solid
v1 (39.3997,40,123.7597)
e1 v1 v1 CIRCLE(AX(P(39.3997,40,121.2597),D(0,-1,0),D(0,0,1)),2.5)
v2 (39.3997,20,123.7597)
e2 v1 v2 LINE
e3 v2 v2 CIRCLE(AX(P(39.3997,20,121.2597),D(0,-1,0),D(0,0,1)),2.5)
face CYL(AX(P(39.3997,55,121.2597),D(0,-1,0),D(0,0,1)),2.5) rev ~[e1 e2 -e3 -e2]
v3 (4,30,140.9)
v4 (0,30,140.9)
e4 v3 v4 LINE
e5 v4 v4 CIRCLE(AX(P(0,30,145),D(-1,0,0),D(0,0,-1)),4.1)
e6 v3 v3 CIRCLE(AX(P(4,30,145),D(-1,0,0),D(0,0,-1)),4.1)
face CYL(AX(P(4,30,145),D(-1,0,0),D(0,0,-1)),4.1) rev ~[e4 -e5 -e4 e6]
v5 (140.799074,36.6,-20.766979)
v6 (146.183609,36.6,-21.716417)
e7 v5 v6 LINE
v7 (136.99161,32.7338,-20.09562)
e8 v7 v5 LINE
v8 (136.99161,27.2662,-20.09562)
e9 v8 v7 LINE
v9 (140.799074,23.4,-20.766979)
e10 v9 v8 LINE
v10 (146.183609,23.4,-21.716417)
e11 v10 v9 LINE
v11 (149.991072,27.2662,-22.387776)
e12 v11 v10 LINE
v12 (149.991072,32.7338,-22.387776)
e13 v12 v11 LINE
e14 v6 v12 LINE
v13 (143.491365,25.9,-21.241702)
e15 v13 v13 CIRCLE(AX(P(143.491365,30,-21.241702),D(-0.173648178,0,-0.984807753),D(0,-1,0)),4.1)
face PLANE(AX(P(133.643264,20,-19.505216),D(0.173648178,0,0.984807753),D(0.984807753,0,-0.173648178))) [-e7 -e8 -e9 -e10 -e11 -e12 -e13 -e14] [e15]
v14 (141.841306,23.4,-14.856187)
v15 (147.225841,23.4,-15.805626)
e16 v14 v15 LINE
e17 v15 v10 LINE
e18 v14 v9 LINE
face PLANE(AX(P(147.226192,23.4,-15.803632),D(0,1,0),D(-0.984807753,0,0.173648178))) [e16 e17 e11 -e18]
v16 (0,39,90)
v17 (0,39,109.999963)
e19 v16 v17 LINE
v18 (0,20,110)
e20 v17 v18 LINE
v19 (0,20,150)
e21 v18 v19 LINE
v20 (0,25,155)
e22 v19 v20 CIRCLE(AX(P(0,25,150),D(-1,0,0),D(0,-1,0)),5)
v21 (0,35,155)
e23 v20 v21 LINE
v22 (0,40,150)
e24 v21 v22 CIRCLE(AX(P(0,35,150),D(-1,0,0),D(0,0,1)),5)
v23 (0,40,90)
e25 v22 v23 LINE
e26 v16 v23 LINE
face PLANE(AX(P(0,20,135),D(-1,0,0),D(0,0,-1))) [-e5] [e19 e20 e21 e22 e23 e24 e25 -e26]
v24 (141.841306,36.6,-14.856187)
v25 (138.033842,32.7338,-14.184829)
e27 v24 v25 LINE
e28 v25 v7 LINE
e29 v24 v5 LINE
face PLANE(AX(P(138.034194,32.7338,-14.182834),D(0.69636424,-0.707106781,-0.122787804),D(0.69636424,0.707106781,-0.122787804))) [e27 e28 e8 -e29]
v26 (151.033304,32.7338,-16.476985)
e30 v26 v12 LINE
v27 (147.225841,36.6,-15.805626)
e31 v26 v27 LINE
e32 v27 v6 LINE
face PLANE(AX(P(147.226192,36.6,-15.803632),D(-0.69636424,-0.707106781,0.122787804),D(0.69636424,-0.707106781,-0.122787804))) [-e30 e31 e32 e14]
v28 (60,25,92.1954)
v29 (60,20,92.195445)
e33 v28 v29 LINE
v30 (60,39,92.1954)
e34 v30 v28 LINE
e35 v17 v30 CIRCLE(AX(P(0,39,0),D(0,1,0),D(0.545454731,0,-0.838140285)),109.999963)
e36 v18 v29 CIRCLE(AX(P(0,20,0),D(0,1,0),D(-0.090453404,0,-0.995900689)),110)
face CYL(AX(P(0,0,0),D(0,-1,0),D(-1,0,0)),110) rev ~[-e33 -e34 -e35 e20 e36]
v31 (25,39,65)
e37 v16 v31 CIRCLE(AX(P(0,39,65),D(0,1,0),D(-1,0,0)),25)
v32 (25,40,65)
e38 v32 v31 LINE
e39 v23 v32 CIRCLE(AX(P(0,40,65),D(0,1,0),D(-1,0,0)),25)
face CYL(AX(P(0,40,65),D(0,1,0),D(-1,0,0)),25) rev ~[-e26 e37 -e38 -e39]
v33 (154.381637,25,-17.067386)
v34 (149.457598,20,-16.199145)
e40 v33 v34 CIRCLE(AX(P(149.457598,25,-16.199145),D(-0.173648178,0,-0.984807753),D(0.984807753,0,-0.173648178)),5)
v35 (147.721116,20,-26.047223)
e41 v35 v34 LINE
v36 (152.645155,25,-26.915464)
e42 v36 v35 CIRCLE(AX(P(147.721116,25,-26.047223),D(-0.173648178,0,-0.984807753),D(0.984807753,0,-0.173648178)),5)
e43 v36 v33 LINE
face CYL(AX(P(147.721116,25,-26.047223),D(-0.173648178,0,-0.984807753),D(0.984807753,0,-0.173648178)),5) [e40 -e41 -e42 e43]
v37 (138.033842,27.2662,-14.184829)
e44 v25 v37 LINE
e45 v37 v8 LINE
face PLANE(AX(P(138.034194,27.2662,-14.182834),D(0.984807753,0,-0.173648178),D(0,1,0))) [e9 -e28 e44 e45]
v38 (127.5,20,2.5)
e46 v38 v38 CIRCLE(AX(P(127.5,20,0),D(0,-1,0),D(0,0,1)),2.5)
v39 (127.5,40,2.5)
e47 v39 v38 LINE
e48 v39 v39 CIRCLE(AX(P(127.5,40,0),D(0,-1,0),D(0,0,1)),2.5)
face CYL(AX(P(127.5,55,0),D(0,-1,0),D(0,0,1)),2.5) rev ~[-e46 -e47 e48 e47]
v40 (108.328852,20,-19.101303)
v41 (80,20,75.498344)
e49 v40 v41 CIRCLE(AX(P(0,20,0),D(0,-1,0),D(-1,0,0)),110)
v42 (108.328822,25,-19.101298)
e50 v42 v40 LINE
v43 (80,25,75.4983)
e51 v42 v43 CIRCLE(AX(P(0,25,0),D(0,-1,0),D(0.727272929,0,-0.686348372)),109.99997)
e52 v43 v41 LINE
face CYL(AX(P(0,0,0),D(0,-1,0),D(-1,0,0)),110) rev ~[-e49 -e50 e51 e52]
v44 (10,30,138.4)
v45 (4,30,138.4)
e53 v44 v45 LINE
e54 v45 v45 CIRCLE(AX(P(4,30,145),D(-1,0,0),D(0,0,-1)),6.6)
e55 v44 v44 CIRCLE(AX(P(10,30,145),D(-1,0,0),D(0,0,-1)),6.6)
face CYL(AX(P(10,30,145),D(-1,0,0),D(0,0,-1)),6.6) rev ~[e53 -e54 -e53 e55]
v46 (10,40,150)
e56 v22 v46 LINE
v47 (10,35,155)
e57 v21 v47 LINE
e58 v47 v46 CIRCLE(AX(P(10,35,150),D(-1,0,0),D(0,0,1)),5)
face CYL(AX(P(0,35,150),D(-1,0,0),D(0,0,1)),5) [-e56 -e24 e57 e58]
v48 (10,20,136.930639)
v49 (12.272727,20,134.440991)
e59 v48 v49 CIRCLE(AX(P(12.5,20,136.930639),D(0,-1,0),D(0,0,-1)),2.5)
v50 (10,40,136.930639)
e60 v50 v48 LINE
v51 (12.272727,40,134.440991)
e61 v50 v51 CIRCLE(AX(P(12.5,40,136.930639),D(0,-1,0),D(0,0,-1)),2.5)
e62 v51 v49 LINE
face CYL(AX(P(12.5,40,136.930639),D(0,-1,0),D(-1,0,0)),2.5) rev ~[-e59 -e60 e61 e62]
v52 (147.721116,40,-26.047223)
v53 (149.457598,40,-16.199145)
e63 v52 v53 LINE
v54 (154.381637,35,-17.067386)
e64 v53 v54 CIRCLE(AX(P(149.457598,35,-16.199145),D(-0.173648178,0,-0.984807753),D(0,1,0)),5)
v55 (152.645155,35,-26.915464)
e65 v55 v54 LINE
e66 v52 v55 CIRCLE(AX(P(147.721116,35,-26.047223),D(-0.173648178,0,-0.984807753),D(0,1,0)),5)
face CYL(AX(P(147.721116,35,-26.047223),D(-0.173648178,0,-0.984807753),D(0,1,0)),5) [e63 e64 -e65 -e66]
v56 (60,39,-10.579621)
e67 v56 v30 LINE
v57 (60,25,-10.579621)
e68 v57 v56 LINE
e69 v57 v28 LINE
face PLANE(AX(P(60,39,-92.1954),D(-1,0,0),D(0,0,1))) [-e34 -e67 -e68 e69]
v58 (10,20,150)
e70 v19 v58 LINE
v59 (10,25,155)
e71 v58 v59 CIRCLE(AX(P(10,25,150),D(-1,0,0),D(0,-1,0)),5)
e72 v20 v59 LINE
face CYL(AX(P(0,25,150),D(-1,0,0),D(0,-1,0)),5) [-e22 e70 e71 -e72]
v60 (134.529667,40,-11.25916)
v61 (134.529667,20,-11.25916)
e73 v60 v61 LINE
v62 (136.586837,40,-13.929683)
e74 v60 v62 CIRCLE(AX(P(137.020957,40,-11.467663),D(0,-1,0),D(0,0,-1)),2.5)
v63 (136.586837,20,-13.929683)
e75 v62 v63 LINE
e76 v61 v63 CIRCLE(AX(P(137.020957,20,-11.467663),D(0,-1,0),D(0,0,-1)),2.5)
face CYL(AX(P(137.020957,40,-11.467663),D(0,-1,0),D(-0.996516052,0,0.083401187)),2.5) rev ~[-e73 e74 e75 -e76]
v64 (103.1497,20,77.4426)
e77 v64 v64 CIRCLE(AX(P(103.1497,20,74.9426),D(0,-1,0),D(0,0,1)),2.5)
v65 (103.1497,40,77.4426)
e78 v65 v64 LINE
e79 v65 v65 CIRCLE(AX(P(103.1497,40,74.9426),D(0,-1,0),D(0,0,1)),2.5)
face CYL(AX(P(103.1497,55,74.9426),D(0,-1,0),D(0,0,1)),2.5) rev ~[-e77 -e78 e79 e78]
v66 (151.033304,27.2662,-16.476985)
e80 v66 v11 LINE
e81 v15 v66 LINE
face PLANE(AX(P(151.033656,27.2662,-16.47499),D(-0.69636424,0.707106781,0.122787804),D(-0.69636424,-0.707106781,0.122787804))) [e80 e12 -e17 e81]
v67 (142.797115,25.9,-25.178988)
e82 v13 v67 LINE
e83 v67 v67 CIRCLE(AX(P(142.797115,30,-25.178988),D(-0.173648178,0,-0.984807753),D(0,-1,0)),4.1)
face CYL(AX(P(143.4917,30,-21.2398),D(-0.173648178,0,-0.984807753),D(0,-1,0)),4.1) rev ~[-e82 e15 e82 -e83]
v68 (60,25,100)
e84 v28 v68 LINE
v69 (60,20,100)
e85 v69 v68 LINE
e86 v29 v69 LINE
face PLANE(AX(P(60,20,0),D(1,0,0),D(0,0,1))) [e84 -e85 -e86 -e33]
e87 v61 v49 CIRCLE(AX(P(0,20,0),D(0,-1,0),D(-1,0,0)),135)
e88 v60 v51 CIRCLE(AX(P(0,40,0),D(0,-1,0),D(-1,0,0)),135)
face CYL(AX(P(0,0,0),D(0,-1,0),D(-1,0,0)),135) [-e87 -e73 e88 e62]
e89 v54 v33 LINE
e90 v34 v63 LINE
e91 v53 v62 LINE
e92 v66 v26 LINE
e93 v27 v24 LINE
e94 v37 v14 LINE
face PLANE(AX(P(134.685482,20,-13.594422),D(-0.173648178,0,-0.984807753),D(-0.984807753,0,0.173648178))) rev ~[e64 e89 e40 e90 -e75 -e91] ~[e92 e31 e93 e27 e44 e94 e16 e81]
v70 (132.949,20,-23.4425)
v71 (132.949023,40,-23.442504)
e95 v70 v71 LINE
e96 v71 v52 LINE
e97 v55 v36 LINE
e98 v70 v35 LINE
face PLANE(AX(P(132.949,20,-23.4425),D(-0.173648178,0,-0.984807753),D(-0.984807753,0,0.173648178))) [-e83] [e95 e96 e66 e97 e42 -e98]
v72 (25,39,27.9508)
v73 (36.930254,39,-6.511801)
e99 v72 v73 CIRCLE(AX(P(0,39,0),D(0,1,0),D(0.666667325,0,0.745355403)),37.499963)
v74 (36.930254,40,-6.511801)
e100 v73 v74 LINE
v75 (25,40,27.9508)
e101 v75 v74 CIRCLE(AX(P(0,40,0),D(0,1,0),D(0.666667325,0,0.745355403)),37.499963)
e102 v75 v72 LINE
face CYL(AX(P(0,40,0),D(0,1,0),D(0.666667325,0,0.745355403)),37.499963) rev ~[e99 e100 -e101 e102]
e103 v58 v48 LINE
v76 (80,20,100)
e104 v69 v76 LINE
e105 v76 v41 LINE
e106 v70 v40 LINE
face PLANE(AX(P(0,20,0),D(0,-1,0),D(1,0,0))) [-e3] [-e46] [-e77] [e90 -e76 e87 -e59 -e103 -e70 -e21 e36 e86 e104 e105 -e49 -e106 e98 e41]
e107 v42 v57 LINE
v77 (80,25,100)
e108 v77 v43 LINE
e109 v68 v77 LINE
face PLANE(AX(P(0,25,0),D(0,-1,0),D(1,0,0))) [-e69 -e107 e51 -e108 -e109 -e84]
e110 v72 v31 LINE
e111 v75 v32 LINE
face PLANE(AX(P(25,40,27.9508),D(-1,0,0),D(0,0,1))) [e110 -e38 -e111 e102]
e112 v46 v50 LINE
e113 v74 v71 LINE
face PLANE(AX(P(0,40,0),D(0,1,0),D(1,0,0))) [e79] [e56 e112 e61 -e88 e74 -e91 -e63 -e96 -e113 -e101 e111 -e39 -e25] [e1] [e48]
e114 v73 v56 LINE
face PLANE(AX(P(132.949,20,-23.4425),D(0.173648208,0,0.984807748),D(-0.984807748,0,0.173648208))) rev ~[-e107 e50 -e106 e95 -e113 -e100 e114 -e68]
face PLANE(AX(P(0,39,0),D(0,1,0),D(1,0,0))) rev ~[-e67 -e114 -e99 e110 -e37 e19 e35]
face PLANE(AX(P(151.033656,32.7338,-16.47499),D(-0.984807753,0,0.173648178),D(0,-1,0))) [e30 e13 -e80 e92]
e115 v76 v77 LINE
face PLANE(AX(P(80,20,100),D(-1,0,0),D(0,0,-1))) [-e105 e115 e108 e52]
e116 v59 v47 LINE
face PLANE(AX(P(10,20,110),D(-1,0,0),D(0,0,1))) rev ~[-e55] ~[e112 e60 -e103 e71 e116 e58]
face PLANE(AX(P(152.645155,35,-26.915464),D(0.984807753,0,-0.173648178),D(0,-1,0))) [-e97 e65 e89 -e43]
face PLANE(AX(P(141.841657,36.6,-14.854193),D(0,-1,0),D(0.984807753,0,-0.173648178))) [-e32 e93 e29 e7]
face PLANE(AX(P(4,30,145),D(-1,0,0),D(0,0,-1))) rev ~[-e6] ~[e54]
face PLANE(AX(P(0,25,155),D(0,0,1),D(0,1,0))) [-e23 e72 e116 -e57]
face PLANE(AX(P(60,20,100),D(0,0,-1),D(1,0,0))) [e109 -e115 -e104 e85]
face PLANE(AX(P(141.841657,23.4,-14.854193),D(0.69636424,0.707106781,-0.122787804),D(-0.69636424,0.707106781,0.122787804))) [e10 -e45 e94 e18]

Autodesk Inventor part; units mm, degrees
ref_plane "YZ Plane" through (0, 0, 0) normal (1, 0, 0) x (0, 1, 0)
ref_plane "XZ Plane" through (0, 0, 0) normal (0, 1, 0) x (-1, 0, 0)
ref_plane "XY Plane" through (0, 0, 0) normal (0, 0, 1) x (1, 0, 0)
sketch "Sketch1" plane through (0, 0, 0) normal (0, 1, 0) x (-1, 0, 0)
  circle A0 centre (0, 0) radius 135
  circle A1 centre (0, 0) radius 110
  dimension "d0" = 270
  dimension "d1" = 220
extrude "Extrusion1" add sketch "Sketch1" along normal blind 55
sketch "Sketch2" plane through (0, 0, 0) normal (0, 0, 1) x (1, 0, 0)
  circle A0 centre (0, 5) radius 18
  line L0 (135, 0) -> (-135, 0) projected
  point P0 (0, 0)
  dimension "d4" = 36
  dimension "d5" = 5
extrude "Extrusion2" cut sketch "Sketch2" against normal through all
sketch "Sketch3" plane through (0, 0, 0) normal (0, -1, 0) x (1, 0, 0)
  circle A0 centre (0, 0) radius 140
extrude "Extrusion3" cut sketch "Sketch3" against normal blind 20
sketch "Sketch4" plane through (0, 20, 0) normal (0, -1, 0) x (1, 0, 0)
  line L0 (0, 0) -> (70, 0)
  line L1 (80, -100) -> (60, -100)
  line L2 (60, -100) -> (60, 100)
  line L3 (60, 100) -> (80, 100)
  line L4 (80, 100) -> (80, -100)
  line L5 (80, -100) -> (60, 100) construction
  line L6 (60, -100) -> (80, 100) construction
  dimension "d10" = 70
  dimension "d11" = 20
  dimension "d12" = 200
extrude "Extrusion4" cut sketch "Sketch4" against normal through all
sketch "Sketch5" plane through (0, 55, 0) normal (0, 1, 0) x (1, 0, 0)
  circle A0 centre (0, 0) radius 127.5
  circle A1 centre (127.5, 0) radius 2
  circle A2 centre (103.1497, 74.9426) radius 2
  circle A3 centre (39.3997, 121.2597) radius 2
  circle A4 centre (-39.3997, 121.2597) radius 2
  circle A5 centre (-103.1497, 74.9426) radius 2
  circle A6 centre (-127.5, 0) radius 2
  circle A7 centre (-103.1497, -74.9426) radius 2
  circle A8 centre (-39.3997, -121.2597) radius 2
  circle A9 centre (39.3997, -121.2597) radius 2
  circle A10 centre (103.1497, -74.9426) radius 2
  dimension "d15" = 255
  dimension "d16" = 4
  dimension "d19" = 360
hole "Hole1" at (127.5, 55, 0) at (103.1497, 55, 74.9426) at (39.3997, 55, 121.2597) at (-39.3997, 55, 121.2597) at (-103.1497, 55, 74.9426) at (-127.5, 55, 0) at (-103.1497, 55, -74.9426) at (-39.3997, 55, -121.2597) at (39.3997, 55, -121.2597) at (103.1497, 55, -74.9426) direction (0, -1, 0) diameter 5 end through all
sketch "Sketch6" plane through (0, 55, 0) normal (0, 1, 0) x (1, 0, 0)
  circle A0 centre (0, 0) radius 140
extrude "Extrusion5" cut sketch "Sketch6" against normal blind 15
sketch "Sketch7" plane through (0, 40, 0) normal (0, 1, 0) x (1, 0, 0)
  circle A0 centre (0, 0) radius 140
  line L0 (80, -100) -> (80, -75.4983) projected
  line L1 (80, -100) -> (80, -75.4983)
  line L2 (60, -100) -> (80, -100) projected
  line L3 (80, -100) -> (60, -100)
  line L4 (60, -100) -> (60, -92.1954)
  line L5 (60, 100) -> (60, 92.1954) projected
  line L6 (60, 92.1954) -> (60, 100)
  line L7 (60, 100) -> (80, 100)
  line L8 (80, 100) -> (80, 75.4983)
  arc A1 (80, -75.4983) -> (80, 75.4983) centre (0, 0) ccw
  arc A2 (60, 92.1954) -> (60, -92.1954) centre (0, 0) ccw
  arc A3 (-25, -65) -> (25, -65) centre (0, -65) ccw
  arc A4 (25, 65) -> (-25, 65) centre (0, 65) ccw
  arc A5 (25, -27.9508) -> (25, 27.9508) centre (0, 0) ccw
  arc A6 (-25, 27.9508) -> (-25, -27.9508) centre (0, 0) ccw
  line L9 (25, 65) -> (25, 27.9508)
  line L10 (25, -27.9508) -> (25, -65)
  line L11 (-25, -65) -> (-25, -27.9508)
  line L12 (-25, 27.9508) -> (-25, 65)
extrude "Extrusion6" add sketch "Sketch7" against normal blind 1 contours L2 L4 A2 L5 L7 L8 A1 L0
sketch "Sketch8" plane through (0, 39, 0) normal (0, -1, 0) x (1, 0, 0)
  line L0 (80, -75.4983) -> (80, -100) projected
  line L1 (80, -100) -> (60, -100)
  line L2 (60, -100) -> (60, 100)
  line L3 (60, 100) -> (80, 100)
  line L4 (80, 100) -> (80, 75.4983)
  line L5 (80, -75.4983) -> (80, -100)
  arc A0 (80, -75.4983) -> (80, 75.4983) centre (0, 0) ccw
  arc A1 (60, 92.1954) -> (60, -92.1954) centre (0, 0) ccw
extrude "Extrusion7" add sketch "Sketch8" along normal blind 14 contours L0 L1 L2 L3 L4 A0
sketch "Sketch9" plane through (0, 20, 0) normal (0, -1, 0) x (1, 0, 0)
  arc A0 (9.9499, -134.6328) -> (-9.9499, -134.6328) centre (0, 0) ccw projected
  spline S0 degree 7 poles (9.9499, -134.6328) (9.4556, -134.6694) (8.9421, -134.7052) (8.4096, -134.74) (7.8582, -134.7735) (7.2882, -134.8052) (6.6998, -134.835) (5.2633, -134.8999) (4.3998, -134.933) (3.5087, -134.9604) (2.5962, -134.9814) (1.6691, -134.9951) (0.7345, -135.0012) (-1.7136, -134.9976) (-3.2083, -134.9756) (-4.6621, -134.9347) (-6.0536, -134.8776) (-7.364, -134.8084) (-8.5782, -134.7318) (-9.7236, -134.6494) (-9.7616, -134.6466) (-9.7995, -134.6439) (-9.8372, -134.6411) (-9.8749, -134.6384) (-9.9124, -134.6356) (-9.9499, -134.6328) knots 0 0 0 0 0 0 0 0 0.214533 0.214533 0.214533 0.214533 0.214533 0.214533 0.508291 0.508291 0.508291 0.508291 0.508291 0.508291 0.983641 0.983641 0.983641 0.983641 0.983641 0.983641 1 1 1 1 1 1 1 1 projected
  line L0 (0, 135) -> (0, -135)
  line L1 (132.949, -23.4425) -> (-132.949, 23.4425)
  point P0 (0, 0)
  dimension "d40" = 80
extrude "Extrusion8" cut sketch "Sketch9" against normal through all contours S0 L0 L1 A0 | S0 A0 L1 L0 | L0 L1 A0 picked at (-5.2242, 89.6957)
sketch "Sketch10" plane through (0, 20, 110) normal (-1, 0, 0) x (0, 0, 1)
  line L0 (25, 0) -> (-133.4425, 0) projected
  line L1 (22.5, 0) -> (40, 0)
  line L2 (45, 5) -> (45, 15)
  line L3 (40, 20) -> (22.5, 20)
  line L4 (22.5, 20) -> (22.5, 0)
  line L5 (25, 20) -> (25, 0) projected
  arc A0 (40, 0) -> (45, 5) centre (40, 5) ccw
  arc A1 (45, 15) -> (40, 20) centre (40, 15) ccw
  point P0 (-110, -20)
  point P1 (45, 20)
  point P2 (45, 0)
  dimension "d43" = 22.5
  dimension "d44" = 20
  dimension "d45" = 20
  dimension "d46" = 5
extrude "Extrusion9" add sketch "Sketch10" against normal blind 10
sketch "Sketch11" plane through (132.949, 20, -23.4425) normal (-0.1736482, 0, -0.9848078) x (-0.9848078, 0, 0.1736482)
  line L0 (0, 20) -> (97.5, 20) projected
  line L1 (2.5, 20) -> (-15, 20)
  line L2 (-20, 15) -> (-20, 5)
  line L3 (-15, 0) -> (2.5, 0)
  line L4 (2.5, 0) -> (2.5, 20)
  line L5 (0, 0) -> (0, 20) projected
  arc A0 (-20, 5) -> (-15, 0) centre (-15, 5) ccw
  arc A1 (-15, 20) -> (-20, 15) centre (-15, 15) ccw
  point P0 (135, -20)
  point P1 (-20, 0)
  point P2 (-20, 20)
  dimension "d49" = 22.5
  dimension "d50" = 20
  dimension "d51" = 20
  dimension "d52" = 5
extrude "Extrusion10" add sketch "Sketch11" against normal blind 10
fillet "Fillet1" radius 2.5 2 edges at (10, 30, 134.6291) (134.3203, 30, -13.53)
sketch "Sketch12" plane through (10, 20, 110) normal (1, 0, 0) x (0, 0, -1)
  line L0 (-40, 0) -> (-26.9306, 0) projected
  line L1 (-45, 15) -> (-45, 5) projected
  point P0 (110, -20)
  point P1 (-35, 10)
  dimension "d56" = 10
  dimension "d57" = 10
hole "Hole2" at (10, 30, 145) direction (-1, 0, 0) diameter 8.2 end through all counterbore diameter 13.2 counterbore depth 6
sketch "Sketch13" plane through (134.6855, 20, -13.5944) normal (0.1736482, 0, 0.9848078) x (0.9848078, 0, -0.1736482)
  line L0 (16.6, 7.2662) -> (12.7338, 3.4)
  line L1 (12.7338, 3.4) -> (7.2662, 3.4)
  line L2 (7.2662, 3.4) -> (3.4, 7.2662)
  line L3 (3.4, 7.2662) -> (3.4, 12.7338)
  line L4 (3.4, 12.7338) -> (7.2662, 16.6)
  line L5 (7.2662, 16.6) -> (12.7338, 16.6)
  line L6 (12.7338, 16.6) -> (16.6, 12.7338)
  line L7 (16.6, 12.7338) -> (16.6, 7.2662)
  line L8 (20, 5) -> (20, 15) projected
  line L9 (1.9306, 0) -> (15, 0) projected
  point P0 (-135, -20)
  point P1 (10, 10)
  point P2 (20, 10)
  dimension "d65" = 10
  dimension "d66" = 10
  dimension "d67" = 13.2
extrude "Extrusion11" cut sketch "Sketch13" against normal blind 6
sketch "Sketch14" plane through (133.6436, 20, -19.5033) normal (0.1736482, 0, 0.9848078) x (0.9848078, 0, -0.1736482)
  line L0 (1.9306, 0) -> (15, 0) projected
  line L1 (20, 5) -> (20, 15) projected
  point P0 (-135, -20)
  point P1 (10, 10)
  dimension "d70" = 10
  dimension "d71" = 10
hole "Hole3" at (143.4917, 30, -21.2398) direction (-0.1736482, 0, -0.9848078) diameter 8.2 end through all
properties part number "Cylinder Spacer Top_Q3"
